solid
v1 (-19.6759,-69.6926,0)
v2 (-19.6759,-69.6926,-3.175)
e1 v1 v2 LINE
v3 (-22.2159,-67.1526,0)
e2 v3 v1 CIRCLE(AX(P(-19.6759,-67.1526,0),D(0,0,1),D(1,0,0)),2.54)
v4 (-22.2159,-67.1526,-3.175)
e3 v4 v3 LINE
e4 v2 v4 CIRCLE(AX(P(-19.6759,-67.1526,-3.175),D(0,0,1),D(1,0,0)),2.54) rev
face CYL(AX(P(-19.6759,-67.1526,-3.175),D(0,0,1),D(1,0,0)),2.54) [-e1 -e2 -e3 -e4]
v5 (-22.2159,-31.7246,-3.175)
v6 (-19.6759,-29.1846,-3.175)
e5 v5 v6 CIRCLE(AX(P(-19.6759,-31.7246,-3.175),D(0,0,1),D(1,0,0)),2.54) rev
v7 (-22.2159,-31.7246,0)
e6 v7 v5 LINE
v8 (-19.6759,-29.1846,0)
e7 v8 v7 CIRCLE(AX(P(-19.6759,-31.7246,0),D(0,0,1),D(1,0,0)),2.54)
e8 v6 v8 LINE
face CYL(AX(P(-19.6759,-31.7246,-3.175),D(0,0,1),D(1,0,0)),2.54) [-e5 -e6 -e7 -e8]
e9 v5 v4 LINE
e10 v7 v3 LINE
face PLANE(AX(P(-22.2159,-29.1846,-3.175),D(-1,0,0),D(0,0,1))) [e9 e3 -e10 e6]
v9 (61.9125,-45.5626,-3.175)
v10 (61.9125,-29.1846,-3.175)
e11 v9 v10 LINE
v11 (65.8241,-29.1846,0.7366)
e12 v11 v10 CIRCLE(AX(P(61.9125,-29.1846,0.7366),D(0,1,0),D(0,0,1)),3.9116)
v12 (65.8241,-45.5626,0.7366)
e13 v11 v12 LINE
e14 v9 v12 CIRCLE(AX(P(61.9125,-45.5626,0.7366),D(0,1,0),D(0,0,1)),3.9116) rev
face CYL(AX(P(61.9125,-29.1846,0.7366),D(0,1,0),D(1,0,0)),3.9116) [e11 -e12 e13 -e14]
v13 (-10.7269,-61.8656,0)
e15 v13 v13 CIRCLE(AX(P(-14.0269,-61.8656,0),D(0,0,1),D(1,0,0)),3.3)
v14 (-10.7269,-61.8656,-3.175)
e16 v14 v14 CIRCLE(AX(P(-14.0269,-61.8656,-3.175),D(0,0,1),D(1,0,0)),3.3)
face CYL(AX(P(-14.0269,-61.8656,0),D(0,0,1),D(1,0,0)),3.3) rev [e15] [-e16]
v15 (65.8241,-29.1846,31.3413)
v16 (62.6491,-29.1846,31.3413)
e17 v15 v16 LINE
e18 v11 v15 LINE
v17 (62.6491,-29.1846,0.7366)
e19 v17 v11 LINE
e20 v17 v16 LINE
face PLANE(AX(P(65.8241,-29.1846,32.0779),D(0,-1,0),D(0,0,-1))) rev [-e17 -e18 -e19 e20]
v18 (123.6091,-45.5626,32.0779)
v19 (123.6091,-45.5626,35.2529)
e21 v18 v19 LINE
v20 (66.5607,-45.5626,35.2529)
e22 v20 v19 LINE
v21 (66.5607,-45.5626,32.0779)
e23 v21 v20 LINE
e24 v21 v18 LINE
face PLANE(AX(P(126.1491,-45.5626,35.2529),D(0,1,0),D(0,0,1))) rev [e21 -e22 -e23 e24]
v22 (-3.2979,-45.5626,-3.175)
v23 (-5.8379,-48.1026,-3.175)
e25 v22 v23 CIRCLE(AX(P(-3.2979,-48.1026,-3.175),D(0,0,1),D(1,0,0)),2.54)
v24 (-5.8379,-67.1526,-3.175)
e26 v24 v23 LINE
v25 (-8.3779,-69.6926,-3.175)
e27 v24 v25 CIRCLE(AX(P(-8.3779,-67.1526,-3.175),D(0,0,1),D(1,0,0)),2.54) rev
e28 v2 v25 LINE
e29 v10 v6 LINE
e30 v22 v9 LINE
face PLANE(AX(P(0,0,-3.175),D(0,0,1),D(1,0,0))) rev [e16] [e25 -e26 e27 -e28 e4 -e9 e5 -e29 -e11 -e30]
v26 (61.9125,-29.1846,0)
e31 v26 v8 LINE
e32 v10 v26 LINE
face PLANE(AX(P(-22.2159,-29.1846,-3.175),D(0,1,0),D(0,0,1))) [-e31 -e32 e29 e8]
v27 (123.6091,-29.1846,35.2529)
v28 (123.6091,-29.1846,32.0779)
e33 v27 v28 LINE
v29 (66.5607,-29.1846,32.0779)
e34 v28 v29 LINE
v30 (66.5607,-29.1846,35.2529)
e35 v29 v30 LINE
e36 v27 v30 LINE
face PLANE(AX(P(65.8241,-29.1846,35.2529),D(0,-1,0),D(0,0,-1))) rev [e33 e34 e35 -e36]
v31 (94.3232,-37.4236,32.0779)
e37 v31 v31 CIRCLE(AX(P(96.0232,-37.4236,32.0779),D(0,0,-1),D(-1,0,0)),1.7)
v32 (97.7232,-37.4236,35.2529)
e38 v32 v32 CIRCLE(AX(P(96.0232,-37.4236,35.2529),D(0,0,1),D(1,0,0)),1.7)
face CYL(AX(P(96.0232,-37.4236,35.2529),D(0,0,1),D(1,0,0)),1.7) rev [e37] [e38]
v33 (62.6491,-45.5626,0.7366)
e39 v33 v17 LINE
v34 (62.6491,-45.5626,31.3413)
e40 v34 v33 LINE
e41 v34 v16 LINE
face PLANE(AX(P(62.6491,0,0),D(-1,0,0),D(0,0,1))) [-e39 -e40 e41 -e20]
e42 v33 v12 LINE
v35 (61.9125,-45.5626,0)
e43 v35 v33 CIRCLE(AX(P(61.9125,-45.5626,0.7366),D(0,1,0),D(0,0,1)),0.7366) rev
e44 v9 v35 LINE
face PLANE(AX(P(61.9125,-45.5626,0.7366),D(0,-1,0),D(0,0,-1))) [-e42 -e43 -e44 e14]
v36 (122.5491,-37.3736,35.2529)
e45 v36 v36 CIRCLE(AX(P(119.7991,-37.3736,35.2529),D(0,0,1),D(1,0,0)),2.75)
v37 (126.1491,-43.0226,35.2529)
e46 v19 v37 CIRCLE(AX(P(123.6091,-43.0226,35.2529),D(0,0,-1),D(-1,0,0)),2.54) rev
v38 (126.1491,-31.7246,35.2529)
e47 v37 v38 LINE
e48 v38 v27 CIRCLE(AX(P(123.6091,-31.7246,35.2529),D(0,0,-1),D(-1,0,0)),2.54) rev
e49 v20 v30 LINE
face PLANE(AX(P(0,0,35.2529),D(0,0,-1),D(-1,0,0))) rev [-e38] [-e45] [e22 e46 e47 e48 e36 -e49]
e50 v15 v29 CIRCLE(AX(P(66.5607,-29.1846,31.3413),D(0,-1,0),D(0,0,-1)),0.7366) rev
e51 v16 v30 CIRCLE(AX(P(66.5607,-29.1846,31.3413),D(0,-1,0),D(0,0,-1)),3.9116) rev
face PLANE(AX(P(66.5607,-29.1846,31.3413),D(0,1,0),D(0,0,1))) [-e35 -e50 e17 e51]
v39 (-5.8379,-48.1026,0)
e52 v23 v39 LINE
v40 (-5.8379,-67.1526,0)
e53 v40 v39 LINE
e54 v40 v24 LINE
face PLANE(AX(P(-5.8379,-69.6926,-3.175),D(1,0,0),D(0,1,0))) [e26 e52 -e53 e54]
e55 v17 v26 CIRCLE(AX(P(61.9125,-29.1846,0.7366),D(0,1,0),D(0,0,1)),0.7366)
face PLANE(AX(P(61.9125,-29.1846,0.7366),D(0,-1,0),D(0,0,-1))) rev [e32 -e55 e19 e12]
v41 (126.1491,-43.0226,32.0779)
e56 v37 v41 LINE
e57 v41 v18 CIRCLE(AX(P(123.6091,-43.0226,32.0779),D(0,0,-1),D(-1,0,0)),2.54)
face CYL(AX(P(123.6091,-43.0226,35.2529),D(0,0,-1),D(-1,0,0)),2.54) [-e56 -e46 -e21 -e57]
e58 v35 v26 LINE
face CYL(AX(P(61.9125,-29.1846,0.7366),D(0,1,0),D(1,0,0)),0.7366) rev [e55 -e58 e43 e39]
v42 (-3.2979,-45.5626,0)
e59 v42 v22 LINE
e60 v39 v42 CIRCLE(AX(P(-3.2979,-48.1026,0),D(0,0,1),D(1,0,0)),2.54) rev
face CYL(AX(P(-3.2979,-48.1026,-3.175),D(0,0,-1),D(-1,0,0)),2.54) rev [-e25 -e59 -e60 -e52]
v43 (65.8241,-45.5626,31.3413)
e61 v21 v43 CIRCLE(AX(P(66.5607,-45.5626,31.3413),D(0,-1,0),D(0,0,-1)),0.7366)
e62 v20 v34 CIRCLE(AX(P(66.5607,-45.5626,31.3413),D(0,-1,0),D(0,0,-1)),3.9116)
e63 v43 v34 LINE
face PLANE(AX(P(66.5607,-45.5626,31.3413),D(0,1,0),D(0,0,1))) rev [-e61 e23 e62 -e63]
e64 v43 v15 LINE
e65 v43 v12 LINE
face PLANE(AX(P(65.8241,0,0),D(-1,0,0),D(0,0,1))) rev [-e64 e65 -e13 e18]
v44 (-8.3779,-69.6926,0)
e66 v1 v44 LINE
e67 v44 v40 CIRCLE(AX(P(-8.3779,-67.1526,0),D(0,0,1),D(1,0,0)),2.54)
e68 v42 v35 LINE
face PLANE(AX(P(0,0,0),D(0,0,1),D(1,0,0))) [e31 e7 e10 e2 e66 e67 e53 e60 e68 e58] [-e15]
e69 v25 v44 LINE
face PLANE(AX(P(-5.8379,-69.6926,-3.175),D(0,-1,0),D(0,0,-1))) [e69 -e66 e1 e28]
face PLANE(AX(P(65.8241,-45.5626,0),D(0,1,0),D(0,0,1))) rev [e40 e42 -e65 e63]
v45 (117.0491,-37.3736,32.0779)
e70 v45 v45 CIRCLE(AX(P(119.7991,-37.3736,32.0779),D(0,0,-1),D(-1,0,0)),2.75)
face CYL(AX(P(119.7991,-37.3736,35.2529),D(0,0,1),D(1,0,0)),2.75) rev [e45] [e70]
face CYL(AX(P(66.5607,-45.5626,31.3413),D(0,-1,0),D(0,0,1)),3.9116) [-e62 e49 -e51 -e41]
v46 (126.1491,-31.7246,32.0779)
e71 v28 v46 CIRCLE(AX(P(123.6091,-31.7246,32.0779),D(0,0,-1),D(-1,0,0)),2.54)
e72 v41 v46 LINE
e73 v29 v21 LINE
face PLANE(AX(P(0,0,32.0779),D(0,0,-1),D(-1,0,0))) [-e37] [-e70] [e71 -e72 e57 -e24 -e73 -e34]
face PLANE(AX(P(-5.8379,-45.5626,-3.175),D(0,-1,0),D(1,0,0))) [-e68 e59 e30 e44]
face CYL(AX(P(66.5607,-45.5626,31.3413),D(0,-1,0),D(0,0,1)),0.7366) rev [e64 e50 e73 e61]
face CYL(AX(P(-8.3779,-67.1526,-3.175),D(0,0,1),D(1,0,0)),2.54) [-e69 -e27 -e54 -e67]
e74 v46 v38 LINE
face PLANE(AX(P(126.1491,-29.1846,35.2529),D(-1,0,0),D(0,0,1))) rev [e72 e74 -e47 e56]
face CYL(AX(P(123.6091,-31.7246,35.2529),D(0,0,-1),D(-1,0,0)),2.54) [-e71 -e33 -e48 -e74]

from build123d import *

# Parameters (mm, degrees)
BASE_FLANGE1_DEPTH           = 3.175
EDGE_FLANGE1_DEPTH           = 16.378
EDGE_FLANGE2_STRIP_W         = 14.1732
EDGE_FLANGE2_STRIP_H         = 3.175
EDGE_FLANGE2_STRIP_CUT_DEPTH = 16.378
EDGE_FLANGE2_DEPTH           = 16.378
M5_CLEARANCE_HOLE1_D         = 5.5
M6_CLEARANCE_HOLE1_D         = 6.6
FILLET1_R                    = 2.54
M3_CLEARANCE_HOLE1_D         = 3.4


# Sheet-metal steps are written as plain solids
with BuildPart() as part:
    # Sketch1 → Base-Flange1 (new body)
    with BuildSketch(Plane.XY):
        Polygon((-22.215900005, -29.184600001), (-22.215900005, -69.692600001), (-5.837899995, -69.692600001), (-5.837899995, -45.562600001), (61.9125, -45.562600001), (61.9125, -29.184600001), align=None)
    extrude(amount=-BASE_FLANGE1_DEPTH)

    # Edge-Flange1 section (across the edge) → Edge-Flange1 (add)
    with BuildSketch(Plane(origin=(62.6491, -45.562600001, 0), x_dir=(-1, 0, 0), z_dir=(0, 1, 0))):
        with BuildLine():
            Line((-3.175, 0.7366), (-3.175, 32.0779))
            Line((-3.175, 32.0779), (0, 32.0779))
            Line((0, 32.0779), (0, 0.7366))
            ThreePointArc((0, 0.7366), (0.215745145, 0.215745145), (0.7366, 0))
            Line((0.7366, 0), (0.7366, -3.175))
            ThreePointArc((0.7366, -3.175), (-2.029318885, -2.029318885), (-3.175, 0.7366))
        make_face()
    extrude(amount=EDGE_FLANGE1_DEPTH)

    # Edge-Flange2 strip (across the edge) → Edge-Flange2 strip cut (cut)
    with BuildSketch(Plane(origin=(65.8241, -29.184600001, 32.0779), x_dir=(0, 0, -1), z_dir=(0, -1, 0))):
        with Locations((-6.35, -1.5875)):
            Rectangle(EDGE_FLANGE2_STRIP_W, EDGE_FLANGE2_STRIP_H)
    extrude(amount=EDGE_FLANGE2_STRIP_CUT_DEPTH, mode=Mode.SUBTRACT)

    # Edge-Flange2 section (across the edge) → Edge-Flange2 (add)
    with BuildSketch(Plane(origin=(65.8241, -29.184600001, 32.0779), x_dir=(0, 0, -1), z_dir=(0, -1, 0))):
        with BuildLine():
            Line((-3.175, 0.7366), (-3.175, 60.325))
            Line((-3.175, 60.325), (0, 60.325))
            Line((0, 60.325), (0, 0.7366))
            ThreePointArc((0, 0.7366), (0.215745145, 0.215745145), (0.7366, 0))
            Line((0.7366, 0), (0.7366, -3.175))
            ThreePointArc((0.7366, -3.175), (-2.029318885, -2.029318885), (-3.175, 0.7366))
        make_face()
    extrude(amount=EDGE_FLANGE2_DEPTH)

    # M5 Clearance Hole1 (through all)
    with Locations(Plane.XY.offset(35.2529)):
        with Locations((119.7991, -37.373600001)):
            Hole(M5_CLEARANCE_HOLE1_D / 2)

    # M6 Clearance Hole1 (through all)
    with Locations(Plane.XY):
        with Locations((-14.0269, -61.865600001)):
            Hole(M6_CLEARANCE_HOLE1_D / 2)

    # Fillet1
    fillet1_edges = [part.edges().sort_by_distance(p)[0] for p in [
        (-22.215900005, -69.692600001, -1.5875),
        (-22.215900005, -29.184600001, -1.5875),
        (-5.837899995, -45.562600001, -1.5875),
        (-5.837899995, -69.692600001, -1.5875),
        (126.1491, -29.184600001, 33.6654),
        (126.1491, -45.562600001, 33.6654),
    ]]
    fillet(fillet1_edges, radius=FILLET1_R)

    # M3 Clearance Hole1 (through all)
    with Locations(Plane.XY.offset(35.2529)):
        with Locations((96.0232, -37.423600001)):
            Hole(M3_CLEARANCE_HOLE1_D / 2)


solid = part.part
